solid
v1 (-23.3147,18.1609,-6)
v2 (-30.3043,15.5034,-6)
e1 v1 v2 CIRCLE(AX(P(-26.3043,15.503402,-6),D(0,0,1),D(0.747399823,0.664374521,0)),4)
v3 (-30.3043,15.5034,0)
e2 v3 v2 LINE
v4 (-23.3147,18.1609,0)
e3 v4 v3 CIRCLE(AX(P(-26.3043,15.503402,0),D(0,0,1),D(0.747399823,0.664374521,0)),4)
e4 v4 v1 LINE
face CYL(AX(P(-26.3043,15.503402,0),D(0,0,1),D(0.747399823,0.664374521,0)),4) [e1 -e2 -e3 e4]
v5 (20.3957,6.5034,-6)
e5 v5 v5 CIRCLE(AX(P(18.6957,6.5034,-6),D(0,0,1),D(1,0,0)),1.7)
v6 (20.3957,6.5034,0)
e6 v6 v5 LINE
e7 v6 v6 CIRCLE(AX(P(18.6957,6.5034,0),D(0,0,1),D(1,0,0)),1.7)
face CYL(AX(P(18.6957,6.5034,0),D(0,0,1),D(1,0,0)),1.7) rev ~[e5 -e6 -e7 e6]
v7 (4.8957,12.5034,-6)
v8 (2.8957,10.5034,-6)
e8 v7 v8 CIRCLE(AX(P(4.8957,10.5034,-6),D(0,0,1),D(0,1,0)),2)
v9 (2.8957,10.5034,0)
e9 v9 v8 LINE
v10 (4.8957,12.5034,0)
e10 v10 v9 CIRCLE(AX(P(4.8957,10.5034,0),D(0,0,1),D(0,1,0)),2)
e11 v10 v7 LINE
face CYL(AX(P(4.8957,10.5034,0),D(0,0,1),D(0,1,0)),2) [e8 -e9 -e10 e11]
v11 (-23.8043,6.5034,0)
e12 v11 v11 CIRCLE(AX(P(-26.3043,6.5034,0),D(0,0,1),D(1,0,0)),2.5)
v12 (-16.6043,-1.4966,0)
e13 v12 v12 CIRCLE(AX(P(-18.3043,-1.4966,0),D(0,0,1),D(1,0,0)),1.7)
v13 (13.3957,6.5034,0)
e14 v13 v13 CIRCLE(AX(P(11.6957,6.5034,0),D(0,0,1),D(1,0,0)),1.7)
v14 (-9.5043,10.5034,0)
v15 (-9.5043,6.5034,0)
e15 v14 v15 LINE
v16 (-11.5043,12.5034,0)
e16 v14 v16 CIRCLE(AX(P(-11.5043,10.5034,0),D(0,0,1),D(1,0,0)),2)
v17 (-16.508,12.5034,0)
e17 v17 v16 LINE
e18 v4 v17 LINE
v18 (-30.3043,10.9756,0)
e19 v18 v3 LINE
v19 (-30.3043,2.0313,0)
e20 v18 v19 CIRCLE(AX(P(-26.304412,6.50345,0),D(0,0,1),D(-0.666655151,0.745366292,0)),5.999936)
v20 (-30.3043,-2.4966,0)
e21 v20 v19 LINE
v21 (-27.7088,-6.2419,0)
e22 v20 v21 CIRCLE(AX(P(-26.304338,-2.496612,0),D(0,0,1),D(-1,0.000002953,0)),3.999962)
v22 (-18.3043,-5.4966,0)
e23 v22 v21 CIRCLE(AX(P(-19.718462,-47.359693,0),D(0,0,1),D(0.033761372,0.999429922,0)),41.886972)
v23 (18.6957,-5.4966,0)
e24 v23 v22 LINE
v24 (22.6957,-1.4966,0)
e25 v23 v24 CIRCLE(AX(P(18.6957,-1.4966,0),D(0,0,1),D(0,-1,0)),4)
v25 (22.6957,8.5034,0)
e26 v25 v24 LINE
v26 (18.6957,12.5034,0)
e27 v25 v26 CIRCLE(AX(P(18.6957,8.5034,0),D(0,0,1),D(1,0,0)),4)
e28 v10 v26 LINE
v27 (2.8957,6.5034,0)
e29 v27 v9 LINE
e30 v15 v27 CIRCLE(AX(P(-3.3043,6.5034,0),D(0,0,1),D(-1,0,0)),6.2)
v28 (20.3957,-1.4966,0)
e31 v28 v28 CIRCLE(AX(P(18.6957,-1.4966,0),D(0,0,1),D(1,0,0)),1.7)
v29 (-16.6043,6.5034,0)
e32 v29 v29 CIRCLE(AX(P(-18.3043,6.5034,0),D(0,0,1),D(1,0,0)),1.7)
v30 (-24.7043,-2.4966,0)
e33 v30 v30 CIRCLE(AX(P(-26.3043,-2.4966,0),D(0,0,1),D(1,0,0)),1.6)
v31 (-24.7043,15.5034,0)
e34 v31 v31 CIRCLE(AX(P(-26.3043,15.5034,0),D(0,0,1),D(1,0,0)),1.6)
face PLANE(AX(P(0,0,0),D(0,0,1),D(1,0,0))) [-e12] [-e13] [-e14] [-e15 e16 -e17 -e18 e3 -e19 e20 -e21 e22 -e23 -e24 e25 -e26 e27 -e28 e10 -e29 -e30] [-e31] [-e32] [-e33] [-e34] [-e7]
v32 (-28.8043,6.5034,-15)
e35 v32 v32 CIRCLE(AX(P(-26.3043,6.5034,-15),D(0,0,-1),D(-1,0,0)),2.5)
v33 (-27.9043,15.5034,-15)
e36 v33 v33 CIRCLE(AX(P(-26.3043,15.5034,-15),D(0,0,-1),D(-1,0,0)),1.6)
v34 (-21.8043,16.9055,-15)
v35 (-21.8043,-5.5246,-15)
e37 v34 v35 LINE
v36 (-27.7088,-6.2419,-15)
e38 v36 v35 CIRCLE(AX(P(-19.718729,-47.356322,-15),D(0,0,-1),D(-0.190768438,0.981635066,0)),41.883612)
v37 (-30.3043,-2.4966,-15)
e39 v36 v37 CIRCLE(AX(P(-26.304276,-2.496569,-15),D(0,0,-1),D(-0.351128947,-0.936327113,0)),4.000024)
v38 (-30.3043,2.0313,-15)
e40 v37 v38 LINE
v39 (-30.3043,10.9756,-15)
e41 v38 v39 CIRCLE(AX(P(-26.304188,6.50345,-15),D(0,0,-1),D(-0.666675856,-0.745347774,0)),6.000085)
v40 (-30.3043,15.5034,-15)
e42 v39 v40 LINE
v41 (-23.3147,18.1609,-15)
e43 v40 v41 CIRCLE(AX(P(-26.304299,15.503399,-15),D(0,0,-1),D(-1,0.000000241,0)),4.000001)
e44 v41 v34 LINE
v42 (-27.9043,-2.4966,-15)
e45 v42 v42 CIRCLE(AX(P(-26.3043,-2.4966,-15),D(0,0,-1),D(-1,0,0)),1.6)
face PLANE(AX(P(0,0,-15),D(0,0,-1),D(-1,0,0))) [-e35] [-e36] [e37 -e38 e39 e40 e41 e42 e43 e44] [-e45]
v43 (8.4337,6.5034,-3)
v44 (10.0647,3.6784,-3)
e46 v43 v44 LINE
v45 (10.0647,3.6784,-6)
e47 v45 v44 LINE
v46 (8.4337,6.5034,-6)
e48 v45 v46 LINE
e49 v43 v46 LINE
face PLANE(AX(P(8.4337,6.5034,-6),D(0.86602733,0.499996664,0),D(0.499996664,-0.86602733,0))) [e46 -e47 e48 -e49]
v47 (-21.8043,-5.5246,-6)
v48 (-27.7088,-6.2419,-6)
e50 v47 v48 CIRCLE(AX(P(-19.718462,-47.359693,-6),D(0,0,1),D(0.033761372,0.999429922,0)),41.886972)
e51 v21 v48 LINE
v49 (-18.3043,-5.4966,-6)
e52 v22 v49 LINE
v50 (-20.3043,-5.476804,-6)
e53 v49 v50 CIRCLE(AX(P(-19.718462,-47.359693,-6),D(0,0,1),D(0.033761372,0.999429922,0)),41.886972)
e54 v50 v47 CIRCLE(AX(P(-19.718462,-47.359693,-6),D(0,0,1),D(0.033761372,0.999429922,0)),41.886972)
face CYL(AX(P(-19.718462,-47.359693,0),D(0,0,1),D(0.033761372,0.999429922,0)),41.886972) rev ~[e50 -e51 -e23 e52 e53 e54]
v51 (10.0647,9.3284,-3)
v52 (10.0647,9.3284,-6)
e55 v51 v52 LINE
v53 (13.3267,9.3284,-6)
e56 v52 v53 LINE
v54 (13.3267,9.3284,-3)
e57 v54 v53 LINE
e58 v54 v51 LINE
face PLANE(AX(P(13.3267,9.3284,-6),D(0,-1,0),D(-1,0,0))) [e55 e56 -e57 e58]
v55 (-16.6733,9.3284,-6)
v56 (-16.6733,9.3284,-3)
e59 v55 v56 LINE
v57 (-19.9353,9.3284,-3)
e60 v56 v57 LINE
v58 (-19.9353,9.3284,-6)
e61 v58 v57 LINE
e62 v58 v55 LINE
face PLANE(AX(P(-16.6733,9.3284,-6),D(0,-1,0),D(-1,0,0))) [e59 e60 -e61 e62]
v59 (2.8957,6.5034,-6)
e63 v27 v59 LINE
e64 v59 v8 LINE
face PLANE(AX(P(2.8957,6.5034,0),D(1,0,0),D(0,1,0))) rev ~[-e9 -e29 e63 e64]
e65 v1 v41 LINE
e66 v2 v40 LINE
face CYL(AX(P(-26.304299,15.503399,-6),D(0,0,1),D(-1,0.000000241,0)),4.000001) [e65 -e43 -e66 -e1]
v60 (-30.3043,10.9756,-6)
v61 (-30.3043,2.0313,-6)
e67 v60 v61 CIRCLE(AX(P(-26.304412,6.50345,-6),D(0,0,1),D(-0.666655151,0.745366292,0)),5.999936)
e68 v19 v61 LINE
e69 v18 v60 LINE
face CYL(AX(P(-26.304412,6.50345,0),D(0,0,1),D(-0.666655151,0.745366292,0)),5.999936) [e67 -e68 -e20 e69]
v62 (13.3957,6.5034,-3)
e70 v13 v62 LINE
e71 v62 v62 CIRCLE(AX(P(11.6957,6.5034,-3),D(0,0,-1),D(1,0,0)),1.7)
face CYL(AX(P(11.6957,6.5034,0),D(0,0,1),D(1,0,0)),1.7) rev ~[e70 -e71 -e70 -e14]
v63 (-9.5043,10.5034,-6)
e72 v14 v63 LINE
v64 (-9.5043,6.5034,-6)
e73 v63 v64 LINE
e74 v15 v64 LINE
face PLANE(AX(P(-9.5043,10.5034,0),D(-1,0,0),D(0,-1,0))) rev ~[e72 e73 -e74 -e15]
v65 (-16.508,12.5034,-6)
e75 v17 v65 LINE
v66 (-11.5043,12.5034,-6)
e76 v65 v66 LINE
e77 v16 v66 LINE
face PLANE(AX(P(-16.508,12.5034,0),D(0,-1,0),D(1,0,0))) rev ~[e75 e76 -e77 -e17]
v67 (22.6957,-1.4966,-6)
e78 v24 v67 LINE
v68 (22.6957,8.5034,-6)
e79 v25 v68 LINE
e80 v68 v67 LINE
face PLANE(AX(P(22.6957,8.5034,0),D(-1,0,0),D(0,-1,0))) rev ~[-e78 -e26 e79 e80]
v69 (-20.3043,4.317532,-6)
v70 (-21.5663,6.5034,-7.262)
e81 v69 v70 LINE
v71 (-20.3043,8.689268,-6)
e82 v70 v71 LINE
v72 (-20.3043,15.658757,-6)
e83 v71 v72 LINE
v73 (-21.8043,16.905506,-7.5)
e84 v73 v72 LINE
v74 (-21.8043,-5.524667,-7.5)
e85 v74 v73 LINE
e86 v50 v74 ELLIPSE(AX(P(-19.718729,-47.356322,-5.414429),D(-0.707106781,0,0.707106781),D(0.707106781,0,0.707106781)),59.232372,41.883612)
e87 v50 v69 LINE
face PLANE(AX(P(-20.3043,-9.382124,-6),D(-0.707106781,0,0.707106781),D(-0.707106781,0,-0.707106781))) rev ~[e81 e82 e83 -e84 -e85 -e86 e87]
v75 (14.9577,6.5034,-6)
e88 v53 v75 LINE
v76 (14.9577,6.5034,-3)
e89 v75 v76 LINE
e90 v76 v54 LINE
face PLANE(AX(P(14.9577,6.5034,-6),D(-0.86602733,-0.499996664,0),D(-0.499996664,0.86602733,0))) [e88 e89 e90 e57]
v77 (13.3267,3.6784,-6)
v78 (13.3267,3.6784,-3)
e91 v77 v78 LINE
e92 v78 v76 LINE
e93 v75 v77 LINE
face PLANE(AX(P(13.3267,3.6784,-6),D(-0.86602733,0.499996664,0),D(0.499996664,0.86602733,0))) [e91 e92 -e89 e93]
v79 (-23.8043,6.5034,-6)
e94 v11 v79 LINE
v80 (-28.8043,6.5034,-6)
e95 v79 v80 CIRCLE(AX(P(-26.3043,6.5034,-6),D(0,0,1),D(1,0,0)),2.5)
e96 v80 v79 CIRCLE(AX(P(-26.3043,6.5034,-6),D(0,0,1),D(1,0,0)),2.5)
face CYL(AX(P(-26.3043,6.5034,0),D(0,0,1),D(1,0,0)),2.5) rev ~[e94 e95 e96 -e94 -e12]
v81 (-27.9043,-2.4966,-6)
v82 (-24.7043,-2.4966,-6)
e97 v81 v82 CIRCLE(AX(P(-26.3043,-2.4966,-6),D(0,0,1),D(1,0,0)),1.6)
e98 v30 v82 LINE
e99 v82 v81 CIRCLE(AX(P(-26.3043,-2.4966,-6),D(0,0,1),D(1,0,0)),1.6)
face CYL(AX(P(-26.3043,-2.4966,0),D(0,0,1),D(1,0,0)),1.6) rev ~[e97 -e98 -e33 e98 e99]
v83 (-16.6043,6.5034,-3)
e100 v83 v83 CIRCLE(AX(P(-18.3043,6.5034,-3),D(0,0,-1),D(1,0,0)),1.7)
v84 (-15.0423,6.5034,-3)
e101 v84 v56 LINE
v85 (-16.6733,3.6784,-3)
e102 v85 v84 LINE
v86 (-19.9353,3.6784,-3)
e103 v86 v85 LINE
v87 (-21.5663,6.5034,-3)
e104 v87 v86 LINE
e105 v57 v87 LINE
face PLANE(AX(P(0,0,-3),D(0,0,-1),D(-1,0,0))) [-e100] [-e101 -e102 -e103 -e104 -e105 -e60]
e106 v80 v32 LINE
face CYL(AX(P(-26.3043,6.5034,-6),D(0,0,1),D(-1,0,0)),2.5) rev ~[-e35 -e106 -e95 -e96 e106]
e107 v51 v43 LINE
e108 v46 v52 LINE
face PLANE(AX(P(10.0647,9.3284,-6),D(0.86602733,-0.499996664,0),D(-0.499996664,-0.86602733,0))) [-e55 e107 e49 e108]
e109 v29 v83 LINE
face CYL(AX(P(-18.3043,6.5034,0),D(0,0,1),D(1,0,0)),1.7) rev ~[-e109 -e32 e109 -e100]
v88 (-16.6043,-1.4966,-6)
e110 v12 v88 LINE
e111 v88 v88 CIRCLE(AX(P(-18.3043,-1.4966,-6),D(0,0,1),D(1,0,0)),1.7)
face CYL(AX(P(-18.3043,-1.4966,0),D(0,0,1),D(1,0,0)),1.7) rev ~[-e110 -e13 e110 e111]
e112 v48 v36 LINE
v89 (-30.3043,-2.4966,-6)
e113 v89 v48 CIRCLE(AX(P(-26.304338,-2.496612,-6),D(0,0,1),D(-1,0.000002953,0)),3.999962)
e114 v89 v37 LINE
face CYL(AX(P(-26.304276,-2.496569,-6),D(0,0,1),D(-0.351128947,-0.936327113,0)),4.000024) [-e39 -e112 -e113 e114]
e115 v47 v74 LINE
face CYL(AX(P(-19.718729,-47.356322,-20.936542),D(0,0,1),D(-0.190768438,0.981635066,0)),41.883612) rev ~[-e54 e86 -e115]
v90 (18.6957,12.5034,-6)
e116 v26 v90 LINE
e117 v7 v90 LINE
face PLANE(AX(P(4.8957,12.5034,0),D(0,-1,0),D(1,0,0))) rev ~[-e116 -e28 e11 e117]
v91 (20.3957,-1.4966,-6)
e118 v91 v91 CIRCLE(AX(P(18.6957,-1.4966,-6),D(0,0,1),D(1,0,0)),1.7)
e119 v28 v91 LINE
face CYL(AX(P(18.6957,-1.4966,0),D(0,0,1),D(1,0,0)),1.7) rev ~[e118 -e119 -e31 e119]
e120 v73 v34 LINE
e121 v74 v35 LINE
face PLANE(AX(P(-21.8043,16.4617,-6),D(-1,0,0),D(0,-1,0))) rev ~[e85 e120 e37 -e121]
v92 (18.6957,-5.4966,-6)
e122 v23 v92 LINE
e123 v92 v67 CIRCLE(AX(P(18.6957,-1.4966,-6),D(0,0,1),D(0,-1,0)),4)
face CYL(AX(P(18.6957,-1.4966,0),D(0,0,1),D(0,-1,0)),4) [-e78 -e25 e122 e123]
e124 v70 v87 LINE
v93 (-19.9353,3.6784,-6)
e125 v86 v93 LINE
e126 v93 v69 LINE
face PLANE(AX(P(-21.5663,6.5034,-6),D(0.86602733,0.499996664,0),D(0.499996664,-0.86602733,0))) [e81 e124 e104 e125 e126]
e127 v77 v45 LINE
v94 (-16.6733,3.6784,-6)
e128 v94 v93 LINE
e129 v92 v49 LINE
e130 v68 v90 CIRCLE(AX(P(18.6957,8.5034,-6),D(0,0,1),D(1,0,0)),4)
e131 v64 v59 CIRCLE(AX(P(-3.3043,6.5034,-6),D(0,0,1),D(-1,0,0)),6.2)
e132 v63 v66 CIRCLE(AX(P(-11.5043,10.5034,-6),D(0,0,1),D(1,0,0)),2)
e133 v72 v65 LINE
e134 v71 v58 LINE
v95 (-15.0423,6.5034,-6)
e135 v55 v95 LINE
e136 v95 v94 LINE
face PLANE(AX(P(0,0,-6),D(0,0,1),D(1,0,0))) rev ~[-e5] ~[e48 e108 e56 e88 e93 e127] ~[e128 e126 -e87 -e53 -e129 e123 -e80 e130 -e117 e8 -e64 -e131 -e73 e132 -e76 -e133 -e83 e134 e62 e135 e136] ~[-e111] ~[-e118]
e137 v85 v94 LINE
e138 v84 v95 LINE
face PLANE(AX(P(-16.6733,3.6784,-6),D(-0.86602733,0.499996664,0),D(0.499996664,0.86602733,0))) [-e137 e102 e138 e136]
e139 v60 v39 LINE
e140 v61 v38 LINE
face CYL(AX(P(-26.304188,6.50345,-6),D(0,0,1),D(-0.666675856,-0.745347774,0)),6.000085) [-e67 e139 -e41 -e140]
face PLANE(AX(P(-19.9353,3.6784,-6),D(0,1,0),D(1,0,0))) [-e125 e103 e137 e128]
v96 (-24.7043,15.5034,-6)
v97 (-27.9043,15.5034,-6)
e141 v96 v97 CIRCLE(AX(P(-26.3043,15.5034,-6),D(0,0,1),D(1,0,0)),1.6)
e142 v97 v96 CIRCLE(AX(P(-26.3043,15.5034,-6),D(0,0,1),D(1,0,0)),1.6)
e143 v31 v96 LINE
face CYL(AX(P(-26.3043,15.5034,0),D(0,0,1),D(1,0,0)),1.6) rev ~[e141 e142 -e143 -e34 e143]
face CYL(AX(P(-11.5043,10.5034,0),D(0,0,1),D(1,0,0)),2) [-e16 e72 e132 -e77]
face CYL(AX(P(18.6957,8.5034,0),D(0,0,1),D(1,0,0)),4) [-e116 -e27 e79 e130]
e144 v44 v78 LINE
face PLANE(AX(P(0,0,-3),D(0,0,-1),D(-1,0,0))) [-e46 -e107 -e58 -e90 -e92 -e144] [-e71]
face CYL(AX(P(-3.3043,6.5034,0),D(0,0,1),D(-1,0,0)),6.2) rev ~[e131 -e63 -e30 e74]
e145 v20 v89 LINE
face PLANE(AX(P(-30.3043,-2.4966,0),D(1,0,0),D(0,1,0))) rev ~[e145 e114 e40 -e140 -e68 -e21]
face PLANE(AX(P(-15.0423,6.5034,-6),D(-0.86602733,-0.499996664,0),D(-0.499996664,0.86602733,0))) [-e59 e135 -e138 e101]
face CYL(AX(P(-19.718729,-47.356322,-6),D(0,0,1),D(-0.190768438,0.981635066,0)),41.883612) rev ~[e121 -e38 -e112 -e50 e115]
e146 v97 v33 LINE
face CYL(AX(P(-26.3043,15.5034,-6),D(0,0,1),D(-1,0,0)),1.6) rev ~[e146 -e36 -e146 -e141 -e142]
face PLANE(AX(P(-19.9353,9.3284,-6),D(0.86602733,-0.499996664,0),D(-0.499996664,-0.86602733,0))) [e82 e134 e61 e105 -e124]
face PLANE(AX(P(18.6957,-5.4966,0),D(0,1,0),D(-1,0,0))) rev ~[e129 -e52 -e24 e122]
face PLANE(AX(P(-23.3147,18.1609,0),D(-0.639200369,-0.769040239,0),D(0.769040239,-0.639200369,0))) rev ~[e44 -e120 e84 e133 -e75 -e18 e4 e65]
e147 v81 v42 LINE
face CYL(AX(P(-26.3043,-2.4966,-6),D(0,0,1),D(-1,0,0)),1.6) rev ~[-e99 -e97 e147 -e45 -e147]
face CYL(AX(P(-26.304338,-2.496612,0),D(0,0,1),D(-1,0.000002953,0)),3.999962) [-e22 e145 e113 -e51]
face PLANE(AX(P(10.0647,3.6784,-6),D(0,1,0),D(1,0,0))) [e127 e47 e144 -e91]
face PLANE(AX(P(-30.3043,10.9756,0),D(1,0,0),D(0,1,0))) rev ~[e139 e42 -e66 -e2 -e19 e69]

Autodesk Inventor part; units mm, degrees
ref_plane "YZ Plane" through (0, 0, 0) normal (1, 0, 0) x (0, 1, 0)
ref_plane "XZ Plane" through (0, 0, 0) normal (0, 1, 0) x (-1, 0, 0)
ref_plane "XY Plane" through (0, 0, 0) normal (0, 0, 1) x (1, 0, 0)
sketch "Sketch1" plane through (0, 0, 0) normal (0, 0, 1) x (1, 0, 0)
  circle A0 centre (-18.3043, -1.4966) radius 1.7
  circle A1 centre (18.6957, -1.4966) radius 1.7
  circle A2 centre (18.6957, 6.5034) radius 1.7 projected
  circle A3 centre (-18.3043, 6.5034) radius 1.7 projected
  circle A4 centre (11.6957, 6.5034) radius 1.7 projected
  arc A5 (22.6957, 8.5034) -> (18.6957, 12.5034) centre (18.6957, 8.5034) ccw
  line L0 (4.8957, 12.5034) -> (18.6957, 12.5034)
  arc A6 (4.8957, 12.5034) -> (2.8957, 10.5034) centre (4.8957, 10.5034) ccw
  line L1 (2.8957, 6.5034) -> (2.8957, 10.5034)
  arc A7 (-9.5043, 6.5034) -> (2.8957, 6.5034) centre (-3.3043, 6.5034) ccw projected
  line L2 (-9.5043, 10.5034) -> (-9.5043, 6.5034)
  arc A8 (-9.5043, 10.5034) -> (-11.5043, 12.5034) centre (-11.5043, 10.5034) ccw
  line L3 (-16.508, 12.5034) -> (-11.5043, 12.5034)
  line L4 (18.6957, -5.4966) -> (-18.3043, -5.4966)
  circle A9 centre (-18.3043, 6.5034) radius 1.7 projected
  circle A10 centre (-26.3043, -2.4966) radius 1.6 projected
  circle A11 centre (-26.3043, 15.5034) radius 1.6 projected
  line L5 (-23.3147, 18.1609) -> (-16.508, 12.5034)
  arc A12 (-23.3147, 18.1609) -> (-30.3043, 15.5034) centre (-26.3043, 15.5034) ccw projected
  line L6 (-30.3043, 10.9756) -> (-30.3043, 15.5034) projected
  arc A13 (-30.3043, 10.9756) -> (-30.3043, 2.0313) centre (-26.3043, 6.5034) ccw projected
  line L7 (-30.3043, -2.4966) -> (-30.3043, 2.0313) projected
  arc A14 (-30.3043, -2.4966) -> (-27.7088, -6.2419) centre (-26.3043, -2.4966) ccw projected
  circle A15 centre (-26.3043, 6.5034) radius 2.5 projected
  arc A16 (-18.3043, -5.4966) -> (-27.7088, -6.2419) centre (-19.7185, -47.358) ccw
  line L8 (22.6957, 8.5034) -> (22.6957, -1.4966)
  arc A17 (18.6957, -5.4966) -> (22.6957, -1.4966) centre (18.6957, -1.4966) ccw
  point P0 (0, 0)
  point P1 (-18.3043, 6.5034)
  dimension "d14" = 12
  dimension "d17" = 8
  dimension "d18" = 4
  dimension "d24" = 6
  dimension "d25" = 2
  dimension "d26" = 2
  dimension "d27" = 2
  dimension "d28" = 2
extrude "Extrusion1" add sketch "Sketch1" against normal blind 6
sketch "Sketch2" plane through (0, 0, -6) normal (0, 0, -1) x (-1, 0, 0)
  circle A0 centre (26.3043, -2.4966) radius 1.6 projected
  circle A1 centre (26.3043, 15.5034) radius 1.6 projected
  circle A2 centre (26.3043, 6.5034) radius 2.5 projected
  arc A3 (30.3043, 15.5034) -> (23.3147, 18.1609) centre (26.3043, 15.5034) ccw projected
  circle A4 centre (18.3043, 6.5034) radius 1.7 projected
  circle A5 centre (18.3043, -5.4966) radius 1.7 projected
  circle A6 centre (26.3043, -2.4966) radius 1.6 projected
  circle A7 centre (26.3043, 15.5034) radius 1.6 projected
  line L0 (14.3043, 6.5034) -> (14.3043, -5.4966) projected
  arc A8 (14.3043, -5.4966) -> (19.7088, -9.2419) centre (18.3043, -5.4966) ccw projected
  line L1 (19.7088, -9.2419) -> (27.7088, -6.2419) projected
  arc A9 (27.7088, -6.2419) -> (30.3043, -2.4966) centre (26.3043, -2.4966) ccw projected
  line L2 (30.3043, -2.4966) -> (30.3043, 2.0313) projected
  arc A10 (30.3043, 2.0313) -> (30.3043, 10.9756) centre (26.3043, 6.5034) ccw projected
  line L3 (30.3043, 10.9756) -> (30.3043, 15.5034) projected
  arc A11 (30.3043, 15.5034) -> (23.3147, 18.1609) centre (26.3043, 15.5034) ccw projected
  line L4 (23.3147, 18.1609) -> (15.3147, 9.1609) projected
  arc A12 (15.3147, 9.1609) -> (14.3043, 6.5034) centre (18.3043, 6.5034) ccw projected
  line L5 (18.3043, 12.5242) -> (23.3147, 18.1609) construction
  arc A13 (27.7088, -6.2419) -> (18.3043, -5.4966) centre (19.7185, -47.358) ccw projected
  line L6 (23.3147, 18.1609) -> (16.508, 12.5034) projected
  line L7 (-4.8957, 12.5034) -> (-18.6957, 12.5034) projected
  line L8 (21.8043, 16.9055) -> (21.8043, -5.5246)
  line L9 (25.163, -7.1966) -> (21.8043, -5.5246)
  circle A14 centre (18.3043, 6.5034) radius 1.7 projected
  point P0 (0, 0)
  dimension "d22" = 3.5
extrude "Extrusion2" add sketch "Sketch2" along normal blind 9 contours L3 A10 L2 A9 A13 L8 L4 A3 | L4 L8 L6
chamfer "Chamfer1" distance 1.5 angle 45 1 edges at (-21.8043, 5.6904, -6)
sketch "Sketch4" plane through (0, 0, -6) normal (0, 0, -1) x (-1, 0, 0)
  circle A0 centre (-11.6957, 6.5034) radius 1.7 projected
  circle A1 centre (18.3043, 6.5034) radius 1.7 projected
  line L0 (-8.4337, 6.5034) -> (-10.0647, 3.6784)
  line L1 (-10.0647, 3.6784) -> (-13.3267, 3.6784)
  line L2 (-13.3267, 3.6784) -> (-14.9577, 6.5034)
  line L3 (-14.9577, 6.5034) -> (-13.3267, 9.3284)
  line L4 (-13.3267, 9.3284) -> (-10.0647, 9.3284)
  line L5 (-10.0647, 9.3284) -> (-8.4337, 6.5034)
  line L6 (15.0423, 6.5034) -> (16.6733, 9.3284)
  line L7 (16.6733, 9.3284) -> (19.9353, 9.3284)
  line L8 (19.9353, 9.3284) -> (21.5663, 6.5034)
  line L9 (21.5663, 6.5034) -> (19.9353, 3.6784)
  line L10 (19.9353, 3.6784) -> (16.6733, 3.6784)
  line L11 (16.6733, 3.6784) -> (15.0423, 6.5034)
  dimension "d21" = 5.65
extrude "Extrusion3" cut sketch "Sketch4" against normal blind 3 and the other way blind 5
properties part number "BLTouch_Connector_joined"
